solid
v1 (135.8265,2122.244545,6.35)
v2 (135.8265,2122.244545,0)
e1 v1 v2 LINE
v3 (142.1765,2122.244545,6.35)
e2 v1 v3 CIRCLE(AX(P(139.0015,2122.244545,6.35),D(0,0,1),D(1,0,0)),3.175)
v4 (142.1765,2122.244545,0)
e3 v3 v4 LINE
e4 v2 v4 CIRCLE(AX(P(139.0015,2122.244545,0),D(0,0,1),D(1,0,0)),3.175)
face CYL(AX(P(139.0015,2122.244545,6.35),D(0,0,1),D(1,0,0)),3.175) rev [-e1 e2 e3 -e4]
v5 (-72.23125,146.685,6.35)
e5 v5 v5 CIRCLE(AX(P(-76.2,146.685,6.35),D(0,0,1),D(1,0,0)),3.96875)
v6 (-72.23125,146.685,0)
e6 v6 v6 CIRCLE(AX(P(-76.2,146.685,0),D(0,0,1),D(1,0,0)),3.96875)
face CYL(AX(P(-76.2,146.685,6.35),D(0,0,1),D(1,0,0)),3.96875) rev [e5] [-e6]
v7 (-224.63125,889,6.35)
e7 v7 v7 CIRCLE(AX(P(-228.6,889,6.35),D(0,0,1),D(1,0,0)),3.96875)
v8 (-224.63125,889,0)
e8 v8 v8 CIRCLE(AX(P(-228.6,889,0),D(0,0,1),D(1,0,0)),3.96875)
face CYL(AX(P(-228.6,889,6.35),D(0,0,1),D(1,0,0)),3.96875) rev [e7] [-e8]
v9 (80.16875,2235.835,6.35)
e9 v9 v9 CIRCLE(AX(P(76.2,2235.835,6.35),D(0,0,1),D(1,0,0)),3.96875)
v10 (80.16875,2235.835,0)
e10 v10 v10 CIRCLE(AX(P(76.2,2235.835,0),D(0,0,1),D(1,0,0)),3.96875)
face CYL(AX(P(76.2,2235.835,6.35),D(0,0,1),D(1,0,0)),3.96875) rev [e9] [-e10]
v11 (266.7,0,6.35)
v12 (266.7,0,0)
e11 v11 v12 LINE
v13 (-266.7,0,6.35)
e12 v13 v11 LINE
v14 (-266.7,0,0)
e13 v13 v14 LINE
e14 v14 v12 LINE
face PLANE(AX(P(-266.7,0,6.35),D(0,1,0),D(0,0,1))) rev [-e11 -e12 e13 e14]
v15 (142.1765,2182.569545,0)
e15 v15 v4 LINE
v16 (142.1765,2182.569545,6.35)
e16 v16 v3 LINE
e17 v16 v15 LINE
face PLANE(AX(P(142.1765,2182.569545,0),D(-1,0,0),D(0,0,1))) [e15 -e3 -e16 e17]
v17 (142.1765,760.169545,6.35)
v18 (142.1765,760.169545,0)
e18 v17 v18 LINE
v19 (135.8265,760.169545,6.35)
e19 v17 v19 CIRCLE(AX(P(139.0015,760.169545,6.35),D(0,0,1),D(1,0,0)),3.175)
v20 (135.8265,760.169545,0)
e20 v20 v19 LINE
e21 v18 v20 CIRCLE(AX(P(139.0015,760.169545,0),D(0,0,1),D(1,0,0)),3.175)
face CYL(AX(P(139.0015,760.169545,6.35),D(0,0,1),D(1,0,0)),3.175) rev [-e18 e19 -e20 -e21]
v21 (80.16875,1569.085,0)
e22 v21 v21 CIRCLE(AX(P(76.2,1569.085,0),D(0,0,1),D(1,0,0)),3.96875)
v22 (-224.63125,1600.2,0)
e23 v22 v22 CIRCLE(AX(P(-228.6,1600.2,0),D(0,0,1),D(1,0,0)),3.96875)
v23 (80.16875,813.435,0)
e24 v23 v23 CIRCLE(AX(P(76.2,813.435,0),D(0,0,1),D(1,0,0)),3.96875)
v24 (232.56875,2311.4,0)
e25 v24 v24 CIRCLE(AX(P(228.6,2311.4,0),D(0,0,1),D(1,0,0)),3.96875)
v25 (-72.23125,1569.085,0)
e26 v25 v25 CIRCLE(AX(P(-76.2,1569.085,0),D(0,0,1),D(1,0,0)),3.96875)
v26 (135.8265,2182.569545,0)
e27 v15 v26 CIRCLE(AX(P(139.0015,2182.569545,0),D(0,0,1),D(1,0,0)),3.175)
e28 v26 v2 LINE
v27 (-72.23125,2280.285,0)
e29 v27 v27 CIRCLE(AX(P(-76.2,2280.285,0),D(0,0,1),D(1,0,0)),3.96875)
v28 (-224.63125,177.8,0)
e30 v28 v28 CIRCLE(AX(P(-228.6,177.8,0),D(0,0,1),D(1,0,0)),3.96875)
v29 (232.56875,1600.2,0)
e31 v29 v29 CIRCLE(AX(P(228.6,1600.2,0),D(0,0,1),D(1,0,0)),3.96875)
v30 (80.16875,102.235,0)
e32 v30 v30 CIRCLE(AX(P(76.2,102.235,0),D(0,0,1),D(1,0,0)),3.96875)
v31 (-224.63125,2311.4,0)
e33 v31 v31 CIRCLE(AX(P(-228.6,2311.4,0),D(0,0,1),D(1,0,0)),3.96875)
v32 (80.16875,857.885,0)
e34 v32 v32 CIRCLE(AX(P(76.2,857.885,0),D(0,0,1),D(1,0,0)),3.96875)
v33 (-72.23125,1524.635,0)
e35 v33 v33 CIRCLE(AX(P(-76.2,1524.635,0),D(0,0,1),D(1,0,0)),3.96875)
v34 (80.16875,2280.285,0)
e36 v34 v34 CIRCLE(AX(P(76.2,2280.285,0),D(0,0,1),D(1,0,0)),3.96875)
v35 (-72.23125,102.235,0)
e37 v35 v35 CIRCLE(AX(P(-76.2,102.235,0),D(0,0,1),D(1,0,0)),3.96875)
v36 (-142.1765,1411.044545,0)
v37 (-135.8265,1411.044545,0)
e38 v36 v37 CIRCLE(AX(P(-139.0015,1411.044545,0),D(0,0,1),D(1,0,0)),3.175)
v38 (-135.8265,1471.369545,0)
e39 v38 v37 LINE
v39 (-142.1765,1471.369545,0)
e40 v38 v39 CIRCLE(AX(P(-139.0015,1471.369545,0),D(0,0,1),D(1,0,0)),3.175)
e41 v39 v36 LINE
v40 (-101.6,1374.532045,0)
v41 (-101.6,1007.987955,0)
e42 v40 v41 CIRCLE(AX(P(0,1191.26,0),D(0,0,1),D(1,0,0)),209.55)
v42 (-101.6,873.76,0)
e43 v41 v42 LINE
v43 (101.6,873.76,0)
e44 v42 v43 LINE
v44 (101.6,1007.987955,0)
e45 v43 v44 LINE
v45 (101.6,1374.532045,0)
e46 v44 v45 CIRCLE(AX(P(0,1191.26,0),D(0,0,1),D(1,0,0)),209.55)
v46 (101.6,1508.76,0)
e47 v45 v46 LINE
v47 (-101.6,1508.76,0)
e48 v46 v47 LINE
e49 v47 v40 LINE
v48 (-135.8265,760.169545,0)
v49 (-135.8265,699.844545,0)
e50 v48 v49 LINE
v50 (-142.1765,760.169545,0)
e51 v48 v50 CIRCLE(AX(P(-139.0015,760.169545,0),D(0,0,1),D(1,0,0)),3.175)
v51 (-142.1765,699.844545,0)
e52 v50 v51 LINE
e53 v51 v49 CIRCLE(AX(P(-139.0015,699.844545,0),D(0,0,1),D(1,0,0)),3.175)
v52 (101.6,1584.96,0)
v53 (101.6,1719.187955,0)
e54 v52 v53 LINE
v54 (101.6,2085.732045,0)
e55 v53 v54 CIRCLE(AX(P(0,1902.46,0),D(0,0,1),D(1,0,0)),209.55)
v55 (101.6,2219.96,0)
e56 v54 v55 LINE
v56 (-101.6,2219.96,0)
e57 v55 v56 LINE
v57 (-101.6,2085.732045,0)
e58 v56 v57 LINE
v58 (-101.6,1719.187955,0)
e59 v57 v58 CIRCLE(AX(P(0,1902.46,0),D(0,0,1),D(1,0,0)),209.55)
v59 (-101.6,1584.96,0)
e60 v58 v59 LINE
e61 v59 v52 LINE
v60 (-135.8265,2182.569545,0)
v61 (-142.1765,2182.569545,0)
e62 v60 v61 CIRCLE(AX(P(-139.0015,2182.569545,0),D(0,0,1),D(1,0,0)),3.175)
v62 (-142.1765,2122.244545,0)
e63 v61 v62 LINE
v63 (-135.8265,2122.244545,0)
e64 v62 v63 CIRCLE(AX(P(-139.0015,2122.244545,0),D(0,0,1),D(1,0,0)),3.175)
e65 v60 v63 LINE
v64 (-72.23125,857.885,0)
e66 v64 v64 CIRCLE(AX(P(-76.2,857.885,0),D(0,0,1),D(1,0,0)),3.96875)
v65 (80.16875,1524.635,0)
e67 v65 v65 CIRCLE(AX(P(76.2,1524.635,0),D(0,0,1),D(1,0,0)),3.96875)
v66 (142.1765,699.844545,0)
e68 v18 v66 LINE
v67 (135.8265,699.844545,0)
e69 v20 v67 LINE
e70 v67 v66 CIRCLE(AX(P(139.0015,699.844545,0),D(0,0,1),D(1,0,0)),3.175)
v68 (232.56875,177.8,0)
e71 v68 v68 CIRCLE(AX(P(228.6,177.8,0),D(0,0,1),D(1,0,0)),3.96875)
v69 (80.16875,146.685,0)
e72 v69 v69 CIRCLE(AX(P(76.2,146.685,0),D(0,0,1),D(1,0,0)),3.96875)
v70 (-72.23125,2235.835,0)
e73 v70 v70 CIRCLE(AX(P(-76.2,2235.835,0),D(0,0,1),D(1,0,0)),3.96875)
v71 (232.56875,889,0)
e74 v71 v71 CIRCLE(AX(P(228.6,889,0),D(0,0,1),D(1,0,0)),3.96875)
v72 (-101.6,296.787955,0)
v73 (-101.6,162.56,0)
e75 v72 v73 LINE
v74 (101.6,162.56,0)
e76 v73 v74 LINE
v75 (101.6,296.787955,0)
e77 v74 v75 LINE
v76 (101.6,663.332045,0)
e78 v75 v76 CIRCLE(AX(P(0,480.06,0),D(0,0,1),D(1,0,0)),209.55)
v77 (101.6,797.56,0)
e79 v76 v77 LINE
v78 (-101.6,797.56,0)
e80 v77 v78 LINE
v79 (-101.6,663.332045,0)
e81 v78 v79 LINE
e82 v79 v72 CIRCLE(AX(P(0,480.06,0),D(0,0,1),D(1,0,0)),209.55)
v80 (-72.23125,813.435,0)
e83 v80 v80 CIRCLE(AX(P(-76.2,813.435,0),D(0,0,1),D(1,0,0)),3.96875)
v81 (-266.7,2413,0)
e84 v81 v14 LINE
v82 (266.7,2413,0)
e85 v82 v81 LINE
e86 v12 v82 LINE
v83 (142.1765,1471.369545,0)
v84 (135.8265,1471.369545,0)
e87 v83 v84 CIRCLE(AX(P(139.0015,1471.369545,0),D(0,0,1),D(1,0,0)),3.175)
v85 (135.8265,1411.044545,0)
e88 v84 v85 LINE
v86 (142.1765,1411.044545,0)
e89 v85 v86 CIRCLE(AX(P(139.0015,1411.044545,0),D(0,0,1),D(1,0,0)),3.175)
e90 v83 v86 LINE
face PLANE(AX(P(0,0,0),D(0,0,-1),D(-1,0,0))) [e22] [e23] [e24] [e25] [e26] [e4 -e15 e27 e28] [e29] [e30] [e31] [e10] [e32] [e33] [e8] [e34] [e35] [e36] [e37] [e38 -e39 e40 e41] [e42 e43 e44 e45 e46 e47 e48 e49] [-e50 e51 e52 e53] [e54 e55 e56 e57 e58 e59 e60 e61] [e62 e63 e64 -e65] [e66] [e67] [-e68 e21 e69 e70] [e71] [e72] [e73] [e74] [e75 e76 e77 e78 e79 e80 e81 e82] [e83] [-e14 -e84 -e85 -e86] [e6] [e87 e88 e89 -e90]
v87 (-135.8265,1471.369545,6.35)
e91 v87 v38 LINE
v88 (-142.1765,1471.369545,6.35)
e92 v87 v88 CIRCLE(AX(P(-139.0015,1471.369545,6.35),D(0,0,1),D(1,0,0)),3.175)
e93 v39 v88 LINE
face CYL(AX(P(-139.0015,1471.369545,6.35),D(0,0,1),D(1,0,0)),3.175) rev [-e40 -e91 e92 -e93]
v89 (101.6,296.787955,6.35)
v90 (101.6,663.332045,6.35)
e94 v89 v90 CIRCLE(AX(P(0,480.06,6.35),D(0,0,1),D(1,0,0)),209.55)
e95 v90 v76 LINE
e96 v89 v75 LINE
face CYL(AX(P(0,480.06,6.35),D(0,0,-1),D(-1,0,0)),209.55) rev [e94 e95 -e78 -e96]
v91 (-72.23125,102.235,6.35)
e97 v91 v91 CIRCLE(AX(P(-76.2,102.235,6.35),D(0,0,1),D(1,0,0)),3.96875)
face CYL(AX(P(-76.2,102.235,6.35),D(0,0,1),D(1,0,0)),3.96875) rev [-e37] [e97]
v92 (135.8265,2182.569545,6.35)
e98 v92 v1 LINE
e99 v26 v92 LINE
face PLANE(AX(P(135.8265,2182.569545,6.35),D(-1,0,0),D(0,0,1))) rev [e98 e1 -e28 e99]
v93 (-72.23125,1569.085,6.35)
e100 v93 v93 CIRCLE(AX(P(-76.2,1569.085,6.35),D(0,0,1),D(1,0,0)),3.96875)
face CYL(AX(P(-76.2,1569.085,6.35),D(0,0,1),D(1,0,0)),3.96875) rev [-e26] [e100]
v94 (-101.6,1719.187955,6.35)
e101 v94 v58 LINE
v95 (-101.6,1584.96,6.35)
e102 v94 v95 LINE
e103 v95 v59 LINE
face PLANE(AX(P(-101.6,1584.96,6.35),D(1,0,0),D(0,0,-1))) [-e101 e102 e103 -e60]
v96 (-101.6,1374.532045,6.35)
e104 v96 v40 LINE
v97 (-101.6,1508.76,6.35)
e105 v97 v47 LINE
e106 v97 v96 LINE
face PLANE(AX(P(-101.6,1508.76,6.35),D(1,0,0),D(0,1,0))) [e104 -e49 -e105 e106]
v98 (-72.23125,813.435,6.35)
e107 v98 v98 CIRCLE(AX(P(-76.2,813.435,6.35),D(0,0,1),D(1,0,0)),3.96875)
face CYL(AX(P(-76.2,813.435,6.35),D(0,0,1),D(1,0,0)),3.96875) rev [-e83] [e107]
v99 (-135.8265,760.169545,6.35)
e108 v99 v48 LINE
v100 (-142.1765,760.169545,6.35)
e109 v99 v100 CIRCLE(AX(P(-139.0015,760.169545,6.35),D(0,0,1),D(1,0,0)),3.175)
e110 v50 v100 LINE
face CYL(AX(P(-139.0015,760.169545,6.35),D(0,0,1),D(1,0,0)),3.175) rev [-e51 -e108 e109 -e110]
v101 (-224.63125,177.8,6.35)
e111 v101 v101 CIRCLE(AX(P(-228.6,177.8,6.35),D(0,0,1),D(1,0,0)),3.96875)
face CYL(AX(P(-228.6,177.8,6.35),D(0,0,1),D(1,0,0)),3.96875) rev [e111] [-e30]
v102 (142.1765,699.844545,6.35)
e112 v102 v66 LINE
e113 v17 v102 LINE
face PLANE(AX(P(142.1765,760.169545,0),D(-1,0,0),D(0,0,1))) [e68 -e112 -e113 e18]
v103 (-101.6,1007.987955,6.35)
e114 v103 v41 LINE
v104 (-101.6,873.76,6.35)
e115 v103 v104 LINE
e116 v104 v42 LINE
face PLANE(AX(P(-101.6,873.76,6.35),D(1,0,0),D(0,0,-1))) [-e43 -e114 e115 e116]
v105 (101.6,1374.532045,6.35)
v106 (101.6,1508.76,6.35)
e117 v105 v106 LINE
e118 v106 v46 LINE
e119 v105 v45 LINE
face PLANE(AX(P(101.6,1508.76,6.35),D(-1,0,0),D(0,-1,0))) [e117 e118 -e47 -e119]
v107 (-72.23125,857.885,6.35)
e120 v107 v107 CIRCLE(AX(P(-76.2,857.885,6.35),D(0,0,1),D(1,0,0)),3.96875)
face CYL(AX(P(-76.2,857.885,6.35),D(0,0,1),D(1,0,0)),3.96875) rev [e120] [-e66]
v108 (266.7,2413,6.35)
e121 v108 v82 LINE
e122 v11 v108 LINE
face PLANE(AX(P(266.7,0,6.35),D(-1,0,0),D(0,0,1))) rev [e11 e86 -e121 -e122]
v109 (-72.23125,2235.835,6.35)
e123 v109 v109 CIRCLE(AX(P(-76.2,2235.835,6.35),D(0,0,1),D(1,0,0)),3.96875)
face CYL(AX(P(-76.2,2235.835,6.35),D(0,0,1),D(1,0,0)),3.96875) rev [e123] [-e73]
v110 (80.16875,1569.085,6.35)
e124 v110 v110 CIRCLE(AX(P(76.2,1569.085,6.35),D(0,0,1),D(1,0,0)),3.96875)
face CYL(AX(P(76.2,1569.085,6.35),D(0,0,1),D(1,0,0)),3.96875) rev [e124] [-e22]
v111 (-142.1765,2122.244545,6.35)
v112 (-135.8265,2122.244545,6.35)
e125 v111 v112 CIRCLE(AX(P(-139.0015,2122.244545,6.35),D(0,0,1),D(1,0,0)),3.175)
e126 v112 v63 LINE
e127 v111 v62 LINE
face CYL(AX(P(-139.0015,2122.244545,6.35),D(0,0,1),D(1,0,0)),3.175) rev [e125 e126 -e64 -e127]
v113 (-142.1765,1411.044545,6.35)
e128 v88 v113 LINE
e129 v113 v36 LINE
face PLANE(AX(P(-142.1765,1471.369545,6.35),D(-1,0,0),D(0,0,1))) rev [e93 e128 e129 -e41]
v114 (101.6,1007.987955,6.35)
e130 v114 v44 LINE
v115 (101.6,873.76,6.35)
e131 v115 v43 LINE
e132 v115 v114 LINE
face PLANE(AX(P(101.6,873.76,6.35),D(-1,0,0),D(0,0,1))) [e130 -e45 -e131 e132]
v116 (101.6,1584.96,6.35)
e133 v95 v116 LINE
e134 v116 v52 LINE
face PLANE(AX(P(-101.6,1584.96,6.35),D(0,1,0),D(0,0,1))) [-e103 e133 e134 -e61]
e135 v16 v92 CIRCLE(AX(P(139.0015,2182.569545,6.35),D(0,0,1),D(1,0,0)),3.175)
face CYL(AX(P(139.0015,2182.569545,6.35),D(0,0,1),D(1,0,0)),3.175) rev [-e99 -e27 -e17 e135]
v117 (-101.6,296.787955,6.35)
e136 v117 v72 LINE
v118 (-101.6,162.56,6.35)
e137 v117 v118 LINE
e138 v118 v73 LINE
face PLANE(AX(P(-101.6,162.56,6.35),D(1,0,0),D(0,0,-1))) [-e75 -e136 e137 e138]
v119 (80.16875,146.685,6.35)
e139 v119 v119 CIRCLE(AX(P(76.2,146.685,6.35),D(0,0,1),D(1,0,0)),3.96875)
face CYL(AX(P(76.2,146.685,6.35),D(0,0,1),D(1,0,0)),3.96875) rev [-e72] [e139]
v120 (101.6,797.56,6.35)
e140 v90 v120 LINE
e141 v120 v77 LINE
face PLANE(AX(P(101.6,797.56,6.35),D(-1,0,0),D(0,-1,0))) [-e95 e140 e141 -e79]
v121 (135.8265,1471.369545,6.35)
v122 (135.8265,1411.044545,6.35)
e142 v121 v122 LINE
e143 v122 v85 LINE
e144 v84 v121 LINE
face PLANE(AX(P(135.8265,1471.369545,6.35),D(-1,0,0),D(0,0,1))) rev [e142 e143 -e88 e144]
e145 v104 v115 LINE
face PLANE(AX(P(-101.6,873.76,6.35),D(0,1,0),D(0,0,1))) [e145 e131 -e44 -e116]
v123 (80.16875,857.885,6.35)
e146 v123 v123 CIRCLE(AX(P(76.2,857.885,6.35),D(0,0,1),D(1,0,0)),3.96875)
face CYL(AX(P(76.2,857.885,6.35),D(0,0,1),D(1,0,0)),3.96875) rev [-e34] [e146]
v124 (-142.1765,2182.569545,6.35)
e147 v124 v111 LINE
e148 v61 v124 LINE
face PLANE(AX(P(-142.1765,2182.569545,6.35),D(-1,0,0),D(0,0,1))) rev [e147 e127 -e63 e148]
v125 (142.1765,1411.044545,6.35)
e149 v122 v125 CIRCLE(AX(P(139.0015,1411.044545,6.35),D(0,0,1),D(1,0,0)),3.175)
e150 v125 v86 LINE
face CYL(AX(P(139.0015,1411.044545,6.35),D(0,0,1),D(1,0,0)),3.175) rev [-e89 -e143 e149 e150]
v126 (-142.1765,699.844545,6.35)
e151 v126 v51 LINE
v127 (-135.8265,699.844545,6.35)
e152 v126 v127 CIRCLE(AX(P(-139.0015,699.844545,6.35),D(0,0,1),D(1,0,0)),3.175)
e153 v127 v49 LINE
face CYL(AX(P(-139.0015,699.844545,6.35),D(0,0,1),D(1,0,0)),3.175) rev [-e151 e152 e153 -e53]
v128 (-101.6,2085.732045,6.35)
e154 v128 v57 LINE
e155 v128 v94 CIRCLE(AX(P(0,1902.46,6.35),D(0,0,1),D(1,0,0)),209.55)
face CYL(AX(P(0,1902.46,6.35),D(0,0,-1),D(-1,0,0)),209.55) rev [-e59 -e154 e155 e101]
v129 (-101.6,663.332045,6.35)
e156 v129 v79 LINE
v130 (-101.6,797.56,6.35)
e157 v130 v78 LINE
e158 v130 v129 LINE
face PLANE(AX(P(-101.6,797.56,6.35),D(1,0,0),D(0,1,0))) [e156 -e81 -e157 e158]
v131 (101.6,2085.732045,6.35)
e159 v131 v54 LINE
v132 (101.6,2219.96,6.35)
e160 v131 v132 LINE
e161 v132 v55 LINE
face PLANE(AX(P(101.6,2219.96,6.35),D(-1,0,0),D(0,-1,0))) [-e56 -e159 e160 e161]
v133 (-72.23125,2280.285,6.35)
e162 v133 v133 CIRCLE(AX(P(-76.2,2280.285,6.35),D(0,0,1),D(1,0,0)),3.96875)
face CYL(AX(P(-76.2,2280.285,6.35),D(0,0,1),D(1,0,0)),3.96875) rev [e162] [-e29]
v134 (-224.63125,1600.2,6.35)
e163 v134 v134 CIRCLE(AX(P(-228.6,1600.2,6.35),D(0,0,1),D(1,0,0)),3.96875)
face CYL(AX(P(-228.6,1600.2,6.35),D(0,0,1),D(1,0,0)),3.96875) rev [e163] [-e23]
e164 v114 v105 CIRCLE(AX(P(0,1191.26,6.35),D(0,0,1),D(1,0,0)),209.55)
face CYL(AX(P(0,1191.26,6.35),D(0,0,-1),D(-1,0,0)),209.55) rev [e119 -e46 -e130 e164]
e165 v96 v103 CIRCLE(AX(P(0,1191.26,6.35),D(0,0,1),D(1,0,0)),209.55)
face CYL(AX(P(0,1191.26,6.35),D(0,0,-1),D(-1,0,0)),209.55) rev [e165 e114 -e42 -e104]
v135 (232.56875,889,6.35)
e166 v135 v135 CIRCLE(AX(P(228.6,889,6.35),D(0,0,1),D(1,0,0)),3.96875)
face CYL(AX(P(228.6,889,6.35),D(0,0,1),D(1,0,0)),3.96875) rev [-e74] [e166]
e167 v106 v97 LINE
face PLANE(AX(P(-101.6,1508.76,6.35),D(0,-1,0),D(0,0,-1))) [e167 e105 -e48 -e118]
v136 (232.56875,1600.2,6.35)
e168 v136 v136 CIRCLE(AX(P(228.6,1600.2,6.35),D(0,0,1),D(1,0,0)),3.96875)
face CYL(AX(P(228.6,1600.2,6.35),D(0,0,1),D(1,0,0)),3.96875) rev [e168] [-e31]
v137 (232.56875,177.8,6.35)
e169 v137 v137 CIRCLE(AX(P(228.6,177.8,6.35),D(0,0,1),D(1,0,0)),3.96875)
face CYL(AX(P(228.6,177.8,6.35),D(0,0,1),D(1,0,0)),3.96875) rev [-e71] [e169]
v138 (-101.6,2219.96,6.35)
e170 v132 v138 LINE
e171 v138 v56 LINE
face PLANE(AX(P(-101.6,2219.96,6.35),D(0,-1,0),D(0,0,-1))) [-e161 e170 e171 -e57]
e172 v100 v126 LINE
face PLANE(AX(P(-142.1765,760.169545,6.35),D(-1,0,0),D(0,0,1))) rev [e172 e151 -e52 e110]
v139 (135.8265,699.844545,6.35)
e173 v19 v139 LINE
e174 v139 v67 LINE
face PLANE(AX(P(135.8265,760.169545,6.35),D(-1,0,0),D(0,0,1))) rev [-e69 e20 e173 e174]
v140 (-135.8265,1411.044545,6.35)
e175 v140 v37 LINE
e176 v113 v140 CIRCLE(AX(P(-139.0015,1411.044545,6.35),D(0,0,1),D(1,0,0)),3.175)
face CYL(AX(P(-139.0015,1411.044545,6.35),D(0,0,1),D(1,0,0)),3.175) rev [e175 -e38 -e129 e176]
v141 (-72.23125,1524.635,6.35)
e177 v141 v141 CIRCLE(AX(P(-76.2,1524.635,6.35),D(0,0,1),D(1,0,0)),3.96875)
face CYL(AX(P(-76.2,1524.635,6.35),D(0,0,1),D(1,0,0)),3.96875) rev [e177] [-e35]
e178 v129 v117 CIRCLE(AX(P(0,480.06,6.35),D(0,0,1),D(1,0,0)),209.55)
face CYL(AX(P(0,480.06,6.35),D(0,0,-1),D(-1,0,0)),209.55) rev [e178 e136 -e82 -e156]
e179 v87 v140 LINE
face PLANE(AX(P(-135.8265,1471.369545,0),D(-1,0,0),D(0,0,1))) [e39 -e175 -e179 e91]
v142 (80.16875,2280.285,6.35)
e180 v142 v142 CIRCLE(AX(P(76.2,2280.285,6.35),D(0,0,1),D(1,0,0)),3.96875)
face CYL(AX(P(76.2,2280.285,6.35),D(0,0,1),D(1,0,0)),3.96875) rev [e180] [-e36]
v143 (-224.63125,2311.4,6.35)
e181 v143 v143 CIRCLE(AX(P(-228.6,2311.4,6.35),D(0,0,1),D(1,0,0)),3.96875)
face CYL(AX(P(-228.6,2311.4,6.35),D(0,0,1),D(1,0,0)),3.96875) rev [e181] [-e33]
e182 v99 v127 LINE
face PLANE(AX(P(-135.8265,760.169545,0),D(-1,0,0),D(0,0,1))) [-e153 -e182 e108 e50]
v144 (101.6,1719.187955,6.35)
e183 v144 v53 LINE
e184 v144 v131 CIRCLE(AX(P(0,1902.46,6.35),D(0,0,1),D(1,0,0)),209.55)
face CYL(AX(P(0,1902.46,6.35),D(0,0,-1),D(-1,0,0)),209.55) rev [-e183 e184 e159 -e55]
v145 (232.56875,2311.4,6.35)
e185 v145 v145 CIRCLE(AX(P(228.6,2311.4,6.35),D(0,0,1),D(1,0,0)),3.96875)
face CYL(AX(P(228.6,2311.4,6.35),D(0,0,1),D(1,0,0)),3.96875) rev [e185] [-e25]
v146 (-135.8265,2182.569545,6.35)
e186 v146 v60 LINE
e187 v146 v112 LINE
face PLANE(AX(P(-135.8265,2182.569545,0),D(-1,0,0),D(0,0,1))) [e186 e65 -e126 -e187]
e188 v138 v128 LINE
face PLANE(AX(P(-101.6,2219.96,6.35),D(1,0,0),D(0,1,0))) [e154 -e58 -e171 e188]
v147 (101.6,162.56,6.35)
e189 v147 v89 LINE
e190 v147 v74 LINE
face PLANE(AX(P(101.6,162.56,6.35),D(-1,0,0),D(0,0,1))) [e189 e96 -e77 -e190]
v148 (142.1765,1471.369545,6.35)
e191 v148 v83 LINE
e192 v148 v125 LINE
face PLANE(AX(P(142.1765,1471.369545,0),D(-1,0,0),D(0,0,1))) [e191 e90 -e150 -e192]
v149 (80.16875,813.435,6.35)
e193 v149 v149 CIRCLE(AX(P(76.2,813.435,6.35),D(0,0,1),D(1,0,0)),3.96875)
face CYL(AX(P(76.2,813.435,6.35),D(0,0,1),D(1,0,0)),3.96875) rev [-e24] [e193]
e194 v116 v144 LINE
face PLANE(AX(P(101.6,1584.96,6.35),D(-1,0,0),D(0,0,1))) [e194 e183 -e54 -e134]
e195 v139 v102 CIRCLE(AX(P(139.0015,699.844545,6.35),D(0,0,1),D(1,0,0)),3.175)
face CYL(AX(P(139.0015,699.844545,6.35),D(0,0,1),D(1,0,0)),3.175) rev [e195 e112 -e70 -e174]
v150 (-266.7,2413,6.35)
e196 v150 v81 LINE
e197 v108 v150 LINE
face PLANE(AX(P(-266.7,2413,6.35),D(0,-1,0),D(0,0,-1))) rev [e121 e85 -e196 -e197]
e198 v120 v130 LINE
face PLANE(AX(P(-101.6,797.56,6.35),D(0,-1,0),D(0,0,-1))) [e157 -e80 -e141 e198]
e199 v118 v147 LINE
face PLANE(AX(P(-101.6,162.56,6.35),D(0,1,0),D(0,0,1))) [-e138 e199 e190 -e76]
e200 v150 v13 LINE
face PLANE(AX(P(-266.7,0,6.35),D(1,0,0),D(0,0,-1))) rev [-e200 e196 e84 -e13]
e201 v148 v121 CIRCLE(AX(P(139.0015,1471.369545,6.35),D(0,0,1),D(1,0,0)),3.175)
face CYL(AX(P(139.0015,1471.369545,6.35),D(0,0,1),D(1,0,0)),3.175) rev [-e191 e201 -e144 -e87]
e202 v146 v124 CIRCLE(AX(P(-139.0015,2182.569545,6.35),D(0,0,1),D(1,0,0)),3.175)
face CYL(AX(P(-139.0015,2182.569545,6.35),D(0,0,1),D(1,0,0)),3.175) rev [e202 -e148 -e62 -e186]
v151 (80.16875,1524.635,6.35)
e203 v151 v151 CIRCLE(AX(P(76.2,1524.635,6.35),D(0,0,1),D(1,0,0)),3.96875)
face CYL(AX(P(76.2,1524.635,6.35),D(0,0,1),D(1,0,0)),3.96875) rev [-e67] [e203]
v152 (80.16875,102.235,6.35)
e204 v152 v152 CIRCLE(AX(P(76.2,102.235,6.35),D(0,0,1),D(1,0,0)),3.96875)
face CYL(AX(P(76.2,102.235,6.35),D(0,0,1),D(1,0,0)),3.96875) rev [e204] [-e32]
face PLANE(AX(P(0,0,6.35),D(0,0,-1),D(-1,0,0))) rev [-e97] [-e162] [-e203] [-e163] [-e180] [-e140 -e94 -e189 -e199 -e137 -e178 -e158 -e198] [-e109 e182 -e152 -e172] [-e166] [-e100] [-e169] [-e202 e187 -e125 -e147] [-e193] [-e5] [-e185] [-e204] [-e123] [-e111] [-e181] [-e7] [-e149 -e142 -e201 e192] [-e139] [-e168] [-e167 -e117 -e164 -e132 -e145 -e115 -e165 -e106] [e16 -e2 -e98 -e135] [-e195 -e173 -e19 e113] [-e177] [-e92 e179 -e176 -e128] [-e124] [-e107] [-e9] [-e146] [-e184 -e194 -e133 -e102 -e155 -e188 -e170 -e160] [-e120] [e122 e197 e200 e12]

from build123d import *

# Parameters (mm, degrees)
SKETCH1_W                       = 533.4
SKETCH1_H                       = 2413
BOSS_EXTRUDE1_DEPTH             = 6.35
F_5_16_0_3125_DIAMETER_HOLE1_D  = 7.9375
F_1_4_0_25_DIAMETER_SLOT1_DEPTH = 6.35


# Read off the part's stored shape, not the designer's step: 1/4 (0.25) Diameter Slot1
with BuildPart() as part:
    # Sketch1 → Boss-Extrude1 (new body)
    with BuildSketch(Plane.XY):
        with Locations((0, 1206.5)):
            Rectangle(SKETCH1_W, SKETCH1_H)
        with BuildLine():
            Line((-101.6, 797.56), (101.6, 797.56))
            Line((101.6, 797.56), (101.6, 663.332045059))
            ThreePointArc((101.6, 663.332045059), (209.55, 480.06), (101.6, 296.787954941))
            Line((101.6, 296.787954941), (101.6, 162.56))
            Line((101.6, 162.56), (-101.6, 162.56))
            Line((-101.6, 162.56), (-101.6, 296.787954941))
            ThreePointArc((-101.6, 296.787954941), (-209.55, 480.06), (-101.6, 663.332045059))
            Line((-101.6, 663.332045059), (-101.6, 797.56))
        make_face(mode=Mode.SUBTRACT)
        with BuildLine():
            Line((-101.6, 1508.76), (-101.6, 1374.532045059))
            ThreePointArc((-101.6, 1374.532045059), (-209.55, 1191.26), (-101.6, 1007.987954941))
            Line((-101.6, 1007.987954941), (-101.6, 873.76))
            Line((-101.6, 873.76), (101.6, 873.76))
            Line((101.6, 873.76), (101.6, 1007.987954941))
            ThreePointArc((101.6, 1007.987954941), (209.55, 1191.26), (101.6, 1374.532045059))
            Line((101.6, 1374.532045059), (101.6, 1508.76))
            Line((101.6, 1508.76), (-101.6, 1508.76))
        make_face(mode=Mode.SUBTRACT)
        with BuildLine():
            Line((-101.6, 2219.96), (-101.6, 2085.732045059))
            ThreePointArc((-101.6, 2085.732045059), (-209.55, 1902.46), (-101.6, 1719.187954941))
            Line((-101.6, 1719.187954941), (-101.6, 1584.96))
            Line((-101.6, 1584.96), (101.6, 1584.96))
            Line((101.6, 1584.96), (101.6, 1719.187954941))
            ThreePointArc((101.6, 1719.187954941), (209.55, 1902.46), (101.6, 2085.732045059))
            Line((101.6, 2085.732045059), (101.6, 2219.96))
            Line((101.6, 2219.96), (-101.6, 2219.96))
        make_face(mode=Mode.SUBTRACT)
    extrude(amount=BOSS_EXTRUDE1_DEPTH)

    # 5/16 (0.3125) Diameter Hole1 (through all)
    with Locations(Plane.XY.offset(6.35)):
        with Locations((-76.2, 146.685), (-76.2, 102.235), (-228.6, 177.8), (76.2, 102.235), (76.2, 146.685), (-76.2, 857.885), (-76.2, 813.435), (76.2, 813.435), (76.2, 857.885), (-76.2, 1569.085), (-76.2, 1524.635), (76.2, 1524.635), (76.2, 1569.085), (-76.2, 2280.285), (-76.2, 2235.835), (76.2, 2235.835), (76.2, 2280.285), (228.6, 177.8), (-228.6, 889), (228.6, 889), (-228.6, 1600.2), (228.6, 1600.2), (-228.6, 2311.4), (228.6, 2311.4)):
            Hole(F_5_16_0_3125_DIAMETER_HOLE1_D / 2)

    # 1/4 (0.25) Diameter Slot1 outline → 1/4 (0.25) Diameter Slot1 (cut)
    with BuildSketch(Plane.XY):
        with BuildLine():
            Line((135.8265, 2182.569545059), (135.8265, 2122.244545059))
            ThreePointArc((135.8265, 2122.244545059), (139.0015, 2119.069545059), (142.1765, 2122.244545059))
            Line((142.1765, 2122.244545059), (142.1765, 2182.569545059))
            ThreePointArc((142.1765, 2182.569545059), (139.0015, 2185.744545059), (135.8265, 2182.569545059))
        make_face()
        with BuildLine():
            Line((142.1765, 1411.044545059), (142.1765, 1471.369545059))
            ThreePointArc((142.1765, 1471.369545059), (139.0015, 1474.544545059), (135.8265, 1471.369545059))
            Line((135.8265, 1471.369545059), (135.8265, 1411.044545059))
            ThreePointArc((135.8265, 1411.044545059), (139.0015, 1407.869545059), (142.1765, 1411.044545059))
        make_face()
        with BuildLine():
            Line((142.1765, 699.844545059), (142.1765, 760.169545059))
            ThreePointArc((142.1765, 760.169545059), (139.0015, 763.344545059), (135.8265, 760.169545059))
            Line((135.8265, 760.169545059), (135.8265, 699.844545059))
            ThreePointArc((135.8265, 699.844545059), (139.0015, 696.669545059), (142.1765, 699.844545059))
        make_face()
        with BuildLine():
            Line((-142.1765, 2182.569545059), (-142.1765, 2122.244545059))
            ThreePointArc((-142.1765, 2122.244545059), (-139.0015, 2119.069545059), (-135.8265, 2122.244545059))
            Line((-135.8265, 2122.244545059), (-135.8265, 2182.569545059))
            ThreePointArc((-135.8265, 2182.569545059), (-139.0015, 2185.744545059), (-142.1765, 2182.569545059))
        make_face()
        with BuildLine():
            Line((-135.8265, 1411.044545059), (-135.8265, 1471.369545059))
            ThreePointArc((-135.8265, 1471.369545059), (-139.0015, 1474.544545059), (-142.1765, 1471.369545059))
            Line((-142.1765, 1471.369545059), (-142.1765, 1411.044545059))
            ThreePointArc((-142.1765, 1411.044545059), (-139.0015, 1407.869545059), (-135.8265, 1411.044545059))
        make_face()
        with BuildLine():
            Line((-135.8265, 699.844545059), (-135.8265, 760.169545059))
            ThreePointArc((-135.8265, 760.169545059), (-139.0015, 763.344545059), (-142.1765, 760.169545059))
            Line((-142.1765, 760.169545059), (-142.1765, 699.844545059))
            ThreePointArc((-142.1765, 699.844545059), (-139.0015, 696.669545059), (-135.8265, 699.844545059))
        make_face()
    extrude(amount=F_1_4_0_25_DIAMETER_SLOT1_DEPTH, mode=Mode.SUBTRACT)


solid = part.part
